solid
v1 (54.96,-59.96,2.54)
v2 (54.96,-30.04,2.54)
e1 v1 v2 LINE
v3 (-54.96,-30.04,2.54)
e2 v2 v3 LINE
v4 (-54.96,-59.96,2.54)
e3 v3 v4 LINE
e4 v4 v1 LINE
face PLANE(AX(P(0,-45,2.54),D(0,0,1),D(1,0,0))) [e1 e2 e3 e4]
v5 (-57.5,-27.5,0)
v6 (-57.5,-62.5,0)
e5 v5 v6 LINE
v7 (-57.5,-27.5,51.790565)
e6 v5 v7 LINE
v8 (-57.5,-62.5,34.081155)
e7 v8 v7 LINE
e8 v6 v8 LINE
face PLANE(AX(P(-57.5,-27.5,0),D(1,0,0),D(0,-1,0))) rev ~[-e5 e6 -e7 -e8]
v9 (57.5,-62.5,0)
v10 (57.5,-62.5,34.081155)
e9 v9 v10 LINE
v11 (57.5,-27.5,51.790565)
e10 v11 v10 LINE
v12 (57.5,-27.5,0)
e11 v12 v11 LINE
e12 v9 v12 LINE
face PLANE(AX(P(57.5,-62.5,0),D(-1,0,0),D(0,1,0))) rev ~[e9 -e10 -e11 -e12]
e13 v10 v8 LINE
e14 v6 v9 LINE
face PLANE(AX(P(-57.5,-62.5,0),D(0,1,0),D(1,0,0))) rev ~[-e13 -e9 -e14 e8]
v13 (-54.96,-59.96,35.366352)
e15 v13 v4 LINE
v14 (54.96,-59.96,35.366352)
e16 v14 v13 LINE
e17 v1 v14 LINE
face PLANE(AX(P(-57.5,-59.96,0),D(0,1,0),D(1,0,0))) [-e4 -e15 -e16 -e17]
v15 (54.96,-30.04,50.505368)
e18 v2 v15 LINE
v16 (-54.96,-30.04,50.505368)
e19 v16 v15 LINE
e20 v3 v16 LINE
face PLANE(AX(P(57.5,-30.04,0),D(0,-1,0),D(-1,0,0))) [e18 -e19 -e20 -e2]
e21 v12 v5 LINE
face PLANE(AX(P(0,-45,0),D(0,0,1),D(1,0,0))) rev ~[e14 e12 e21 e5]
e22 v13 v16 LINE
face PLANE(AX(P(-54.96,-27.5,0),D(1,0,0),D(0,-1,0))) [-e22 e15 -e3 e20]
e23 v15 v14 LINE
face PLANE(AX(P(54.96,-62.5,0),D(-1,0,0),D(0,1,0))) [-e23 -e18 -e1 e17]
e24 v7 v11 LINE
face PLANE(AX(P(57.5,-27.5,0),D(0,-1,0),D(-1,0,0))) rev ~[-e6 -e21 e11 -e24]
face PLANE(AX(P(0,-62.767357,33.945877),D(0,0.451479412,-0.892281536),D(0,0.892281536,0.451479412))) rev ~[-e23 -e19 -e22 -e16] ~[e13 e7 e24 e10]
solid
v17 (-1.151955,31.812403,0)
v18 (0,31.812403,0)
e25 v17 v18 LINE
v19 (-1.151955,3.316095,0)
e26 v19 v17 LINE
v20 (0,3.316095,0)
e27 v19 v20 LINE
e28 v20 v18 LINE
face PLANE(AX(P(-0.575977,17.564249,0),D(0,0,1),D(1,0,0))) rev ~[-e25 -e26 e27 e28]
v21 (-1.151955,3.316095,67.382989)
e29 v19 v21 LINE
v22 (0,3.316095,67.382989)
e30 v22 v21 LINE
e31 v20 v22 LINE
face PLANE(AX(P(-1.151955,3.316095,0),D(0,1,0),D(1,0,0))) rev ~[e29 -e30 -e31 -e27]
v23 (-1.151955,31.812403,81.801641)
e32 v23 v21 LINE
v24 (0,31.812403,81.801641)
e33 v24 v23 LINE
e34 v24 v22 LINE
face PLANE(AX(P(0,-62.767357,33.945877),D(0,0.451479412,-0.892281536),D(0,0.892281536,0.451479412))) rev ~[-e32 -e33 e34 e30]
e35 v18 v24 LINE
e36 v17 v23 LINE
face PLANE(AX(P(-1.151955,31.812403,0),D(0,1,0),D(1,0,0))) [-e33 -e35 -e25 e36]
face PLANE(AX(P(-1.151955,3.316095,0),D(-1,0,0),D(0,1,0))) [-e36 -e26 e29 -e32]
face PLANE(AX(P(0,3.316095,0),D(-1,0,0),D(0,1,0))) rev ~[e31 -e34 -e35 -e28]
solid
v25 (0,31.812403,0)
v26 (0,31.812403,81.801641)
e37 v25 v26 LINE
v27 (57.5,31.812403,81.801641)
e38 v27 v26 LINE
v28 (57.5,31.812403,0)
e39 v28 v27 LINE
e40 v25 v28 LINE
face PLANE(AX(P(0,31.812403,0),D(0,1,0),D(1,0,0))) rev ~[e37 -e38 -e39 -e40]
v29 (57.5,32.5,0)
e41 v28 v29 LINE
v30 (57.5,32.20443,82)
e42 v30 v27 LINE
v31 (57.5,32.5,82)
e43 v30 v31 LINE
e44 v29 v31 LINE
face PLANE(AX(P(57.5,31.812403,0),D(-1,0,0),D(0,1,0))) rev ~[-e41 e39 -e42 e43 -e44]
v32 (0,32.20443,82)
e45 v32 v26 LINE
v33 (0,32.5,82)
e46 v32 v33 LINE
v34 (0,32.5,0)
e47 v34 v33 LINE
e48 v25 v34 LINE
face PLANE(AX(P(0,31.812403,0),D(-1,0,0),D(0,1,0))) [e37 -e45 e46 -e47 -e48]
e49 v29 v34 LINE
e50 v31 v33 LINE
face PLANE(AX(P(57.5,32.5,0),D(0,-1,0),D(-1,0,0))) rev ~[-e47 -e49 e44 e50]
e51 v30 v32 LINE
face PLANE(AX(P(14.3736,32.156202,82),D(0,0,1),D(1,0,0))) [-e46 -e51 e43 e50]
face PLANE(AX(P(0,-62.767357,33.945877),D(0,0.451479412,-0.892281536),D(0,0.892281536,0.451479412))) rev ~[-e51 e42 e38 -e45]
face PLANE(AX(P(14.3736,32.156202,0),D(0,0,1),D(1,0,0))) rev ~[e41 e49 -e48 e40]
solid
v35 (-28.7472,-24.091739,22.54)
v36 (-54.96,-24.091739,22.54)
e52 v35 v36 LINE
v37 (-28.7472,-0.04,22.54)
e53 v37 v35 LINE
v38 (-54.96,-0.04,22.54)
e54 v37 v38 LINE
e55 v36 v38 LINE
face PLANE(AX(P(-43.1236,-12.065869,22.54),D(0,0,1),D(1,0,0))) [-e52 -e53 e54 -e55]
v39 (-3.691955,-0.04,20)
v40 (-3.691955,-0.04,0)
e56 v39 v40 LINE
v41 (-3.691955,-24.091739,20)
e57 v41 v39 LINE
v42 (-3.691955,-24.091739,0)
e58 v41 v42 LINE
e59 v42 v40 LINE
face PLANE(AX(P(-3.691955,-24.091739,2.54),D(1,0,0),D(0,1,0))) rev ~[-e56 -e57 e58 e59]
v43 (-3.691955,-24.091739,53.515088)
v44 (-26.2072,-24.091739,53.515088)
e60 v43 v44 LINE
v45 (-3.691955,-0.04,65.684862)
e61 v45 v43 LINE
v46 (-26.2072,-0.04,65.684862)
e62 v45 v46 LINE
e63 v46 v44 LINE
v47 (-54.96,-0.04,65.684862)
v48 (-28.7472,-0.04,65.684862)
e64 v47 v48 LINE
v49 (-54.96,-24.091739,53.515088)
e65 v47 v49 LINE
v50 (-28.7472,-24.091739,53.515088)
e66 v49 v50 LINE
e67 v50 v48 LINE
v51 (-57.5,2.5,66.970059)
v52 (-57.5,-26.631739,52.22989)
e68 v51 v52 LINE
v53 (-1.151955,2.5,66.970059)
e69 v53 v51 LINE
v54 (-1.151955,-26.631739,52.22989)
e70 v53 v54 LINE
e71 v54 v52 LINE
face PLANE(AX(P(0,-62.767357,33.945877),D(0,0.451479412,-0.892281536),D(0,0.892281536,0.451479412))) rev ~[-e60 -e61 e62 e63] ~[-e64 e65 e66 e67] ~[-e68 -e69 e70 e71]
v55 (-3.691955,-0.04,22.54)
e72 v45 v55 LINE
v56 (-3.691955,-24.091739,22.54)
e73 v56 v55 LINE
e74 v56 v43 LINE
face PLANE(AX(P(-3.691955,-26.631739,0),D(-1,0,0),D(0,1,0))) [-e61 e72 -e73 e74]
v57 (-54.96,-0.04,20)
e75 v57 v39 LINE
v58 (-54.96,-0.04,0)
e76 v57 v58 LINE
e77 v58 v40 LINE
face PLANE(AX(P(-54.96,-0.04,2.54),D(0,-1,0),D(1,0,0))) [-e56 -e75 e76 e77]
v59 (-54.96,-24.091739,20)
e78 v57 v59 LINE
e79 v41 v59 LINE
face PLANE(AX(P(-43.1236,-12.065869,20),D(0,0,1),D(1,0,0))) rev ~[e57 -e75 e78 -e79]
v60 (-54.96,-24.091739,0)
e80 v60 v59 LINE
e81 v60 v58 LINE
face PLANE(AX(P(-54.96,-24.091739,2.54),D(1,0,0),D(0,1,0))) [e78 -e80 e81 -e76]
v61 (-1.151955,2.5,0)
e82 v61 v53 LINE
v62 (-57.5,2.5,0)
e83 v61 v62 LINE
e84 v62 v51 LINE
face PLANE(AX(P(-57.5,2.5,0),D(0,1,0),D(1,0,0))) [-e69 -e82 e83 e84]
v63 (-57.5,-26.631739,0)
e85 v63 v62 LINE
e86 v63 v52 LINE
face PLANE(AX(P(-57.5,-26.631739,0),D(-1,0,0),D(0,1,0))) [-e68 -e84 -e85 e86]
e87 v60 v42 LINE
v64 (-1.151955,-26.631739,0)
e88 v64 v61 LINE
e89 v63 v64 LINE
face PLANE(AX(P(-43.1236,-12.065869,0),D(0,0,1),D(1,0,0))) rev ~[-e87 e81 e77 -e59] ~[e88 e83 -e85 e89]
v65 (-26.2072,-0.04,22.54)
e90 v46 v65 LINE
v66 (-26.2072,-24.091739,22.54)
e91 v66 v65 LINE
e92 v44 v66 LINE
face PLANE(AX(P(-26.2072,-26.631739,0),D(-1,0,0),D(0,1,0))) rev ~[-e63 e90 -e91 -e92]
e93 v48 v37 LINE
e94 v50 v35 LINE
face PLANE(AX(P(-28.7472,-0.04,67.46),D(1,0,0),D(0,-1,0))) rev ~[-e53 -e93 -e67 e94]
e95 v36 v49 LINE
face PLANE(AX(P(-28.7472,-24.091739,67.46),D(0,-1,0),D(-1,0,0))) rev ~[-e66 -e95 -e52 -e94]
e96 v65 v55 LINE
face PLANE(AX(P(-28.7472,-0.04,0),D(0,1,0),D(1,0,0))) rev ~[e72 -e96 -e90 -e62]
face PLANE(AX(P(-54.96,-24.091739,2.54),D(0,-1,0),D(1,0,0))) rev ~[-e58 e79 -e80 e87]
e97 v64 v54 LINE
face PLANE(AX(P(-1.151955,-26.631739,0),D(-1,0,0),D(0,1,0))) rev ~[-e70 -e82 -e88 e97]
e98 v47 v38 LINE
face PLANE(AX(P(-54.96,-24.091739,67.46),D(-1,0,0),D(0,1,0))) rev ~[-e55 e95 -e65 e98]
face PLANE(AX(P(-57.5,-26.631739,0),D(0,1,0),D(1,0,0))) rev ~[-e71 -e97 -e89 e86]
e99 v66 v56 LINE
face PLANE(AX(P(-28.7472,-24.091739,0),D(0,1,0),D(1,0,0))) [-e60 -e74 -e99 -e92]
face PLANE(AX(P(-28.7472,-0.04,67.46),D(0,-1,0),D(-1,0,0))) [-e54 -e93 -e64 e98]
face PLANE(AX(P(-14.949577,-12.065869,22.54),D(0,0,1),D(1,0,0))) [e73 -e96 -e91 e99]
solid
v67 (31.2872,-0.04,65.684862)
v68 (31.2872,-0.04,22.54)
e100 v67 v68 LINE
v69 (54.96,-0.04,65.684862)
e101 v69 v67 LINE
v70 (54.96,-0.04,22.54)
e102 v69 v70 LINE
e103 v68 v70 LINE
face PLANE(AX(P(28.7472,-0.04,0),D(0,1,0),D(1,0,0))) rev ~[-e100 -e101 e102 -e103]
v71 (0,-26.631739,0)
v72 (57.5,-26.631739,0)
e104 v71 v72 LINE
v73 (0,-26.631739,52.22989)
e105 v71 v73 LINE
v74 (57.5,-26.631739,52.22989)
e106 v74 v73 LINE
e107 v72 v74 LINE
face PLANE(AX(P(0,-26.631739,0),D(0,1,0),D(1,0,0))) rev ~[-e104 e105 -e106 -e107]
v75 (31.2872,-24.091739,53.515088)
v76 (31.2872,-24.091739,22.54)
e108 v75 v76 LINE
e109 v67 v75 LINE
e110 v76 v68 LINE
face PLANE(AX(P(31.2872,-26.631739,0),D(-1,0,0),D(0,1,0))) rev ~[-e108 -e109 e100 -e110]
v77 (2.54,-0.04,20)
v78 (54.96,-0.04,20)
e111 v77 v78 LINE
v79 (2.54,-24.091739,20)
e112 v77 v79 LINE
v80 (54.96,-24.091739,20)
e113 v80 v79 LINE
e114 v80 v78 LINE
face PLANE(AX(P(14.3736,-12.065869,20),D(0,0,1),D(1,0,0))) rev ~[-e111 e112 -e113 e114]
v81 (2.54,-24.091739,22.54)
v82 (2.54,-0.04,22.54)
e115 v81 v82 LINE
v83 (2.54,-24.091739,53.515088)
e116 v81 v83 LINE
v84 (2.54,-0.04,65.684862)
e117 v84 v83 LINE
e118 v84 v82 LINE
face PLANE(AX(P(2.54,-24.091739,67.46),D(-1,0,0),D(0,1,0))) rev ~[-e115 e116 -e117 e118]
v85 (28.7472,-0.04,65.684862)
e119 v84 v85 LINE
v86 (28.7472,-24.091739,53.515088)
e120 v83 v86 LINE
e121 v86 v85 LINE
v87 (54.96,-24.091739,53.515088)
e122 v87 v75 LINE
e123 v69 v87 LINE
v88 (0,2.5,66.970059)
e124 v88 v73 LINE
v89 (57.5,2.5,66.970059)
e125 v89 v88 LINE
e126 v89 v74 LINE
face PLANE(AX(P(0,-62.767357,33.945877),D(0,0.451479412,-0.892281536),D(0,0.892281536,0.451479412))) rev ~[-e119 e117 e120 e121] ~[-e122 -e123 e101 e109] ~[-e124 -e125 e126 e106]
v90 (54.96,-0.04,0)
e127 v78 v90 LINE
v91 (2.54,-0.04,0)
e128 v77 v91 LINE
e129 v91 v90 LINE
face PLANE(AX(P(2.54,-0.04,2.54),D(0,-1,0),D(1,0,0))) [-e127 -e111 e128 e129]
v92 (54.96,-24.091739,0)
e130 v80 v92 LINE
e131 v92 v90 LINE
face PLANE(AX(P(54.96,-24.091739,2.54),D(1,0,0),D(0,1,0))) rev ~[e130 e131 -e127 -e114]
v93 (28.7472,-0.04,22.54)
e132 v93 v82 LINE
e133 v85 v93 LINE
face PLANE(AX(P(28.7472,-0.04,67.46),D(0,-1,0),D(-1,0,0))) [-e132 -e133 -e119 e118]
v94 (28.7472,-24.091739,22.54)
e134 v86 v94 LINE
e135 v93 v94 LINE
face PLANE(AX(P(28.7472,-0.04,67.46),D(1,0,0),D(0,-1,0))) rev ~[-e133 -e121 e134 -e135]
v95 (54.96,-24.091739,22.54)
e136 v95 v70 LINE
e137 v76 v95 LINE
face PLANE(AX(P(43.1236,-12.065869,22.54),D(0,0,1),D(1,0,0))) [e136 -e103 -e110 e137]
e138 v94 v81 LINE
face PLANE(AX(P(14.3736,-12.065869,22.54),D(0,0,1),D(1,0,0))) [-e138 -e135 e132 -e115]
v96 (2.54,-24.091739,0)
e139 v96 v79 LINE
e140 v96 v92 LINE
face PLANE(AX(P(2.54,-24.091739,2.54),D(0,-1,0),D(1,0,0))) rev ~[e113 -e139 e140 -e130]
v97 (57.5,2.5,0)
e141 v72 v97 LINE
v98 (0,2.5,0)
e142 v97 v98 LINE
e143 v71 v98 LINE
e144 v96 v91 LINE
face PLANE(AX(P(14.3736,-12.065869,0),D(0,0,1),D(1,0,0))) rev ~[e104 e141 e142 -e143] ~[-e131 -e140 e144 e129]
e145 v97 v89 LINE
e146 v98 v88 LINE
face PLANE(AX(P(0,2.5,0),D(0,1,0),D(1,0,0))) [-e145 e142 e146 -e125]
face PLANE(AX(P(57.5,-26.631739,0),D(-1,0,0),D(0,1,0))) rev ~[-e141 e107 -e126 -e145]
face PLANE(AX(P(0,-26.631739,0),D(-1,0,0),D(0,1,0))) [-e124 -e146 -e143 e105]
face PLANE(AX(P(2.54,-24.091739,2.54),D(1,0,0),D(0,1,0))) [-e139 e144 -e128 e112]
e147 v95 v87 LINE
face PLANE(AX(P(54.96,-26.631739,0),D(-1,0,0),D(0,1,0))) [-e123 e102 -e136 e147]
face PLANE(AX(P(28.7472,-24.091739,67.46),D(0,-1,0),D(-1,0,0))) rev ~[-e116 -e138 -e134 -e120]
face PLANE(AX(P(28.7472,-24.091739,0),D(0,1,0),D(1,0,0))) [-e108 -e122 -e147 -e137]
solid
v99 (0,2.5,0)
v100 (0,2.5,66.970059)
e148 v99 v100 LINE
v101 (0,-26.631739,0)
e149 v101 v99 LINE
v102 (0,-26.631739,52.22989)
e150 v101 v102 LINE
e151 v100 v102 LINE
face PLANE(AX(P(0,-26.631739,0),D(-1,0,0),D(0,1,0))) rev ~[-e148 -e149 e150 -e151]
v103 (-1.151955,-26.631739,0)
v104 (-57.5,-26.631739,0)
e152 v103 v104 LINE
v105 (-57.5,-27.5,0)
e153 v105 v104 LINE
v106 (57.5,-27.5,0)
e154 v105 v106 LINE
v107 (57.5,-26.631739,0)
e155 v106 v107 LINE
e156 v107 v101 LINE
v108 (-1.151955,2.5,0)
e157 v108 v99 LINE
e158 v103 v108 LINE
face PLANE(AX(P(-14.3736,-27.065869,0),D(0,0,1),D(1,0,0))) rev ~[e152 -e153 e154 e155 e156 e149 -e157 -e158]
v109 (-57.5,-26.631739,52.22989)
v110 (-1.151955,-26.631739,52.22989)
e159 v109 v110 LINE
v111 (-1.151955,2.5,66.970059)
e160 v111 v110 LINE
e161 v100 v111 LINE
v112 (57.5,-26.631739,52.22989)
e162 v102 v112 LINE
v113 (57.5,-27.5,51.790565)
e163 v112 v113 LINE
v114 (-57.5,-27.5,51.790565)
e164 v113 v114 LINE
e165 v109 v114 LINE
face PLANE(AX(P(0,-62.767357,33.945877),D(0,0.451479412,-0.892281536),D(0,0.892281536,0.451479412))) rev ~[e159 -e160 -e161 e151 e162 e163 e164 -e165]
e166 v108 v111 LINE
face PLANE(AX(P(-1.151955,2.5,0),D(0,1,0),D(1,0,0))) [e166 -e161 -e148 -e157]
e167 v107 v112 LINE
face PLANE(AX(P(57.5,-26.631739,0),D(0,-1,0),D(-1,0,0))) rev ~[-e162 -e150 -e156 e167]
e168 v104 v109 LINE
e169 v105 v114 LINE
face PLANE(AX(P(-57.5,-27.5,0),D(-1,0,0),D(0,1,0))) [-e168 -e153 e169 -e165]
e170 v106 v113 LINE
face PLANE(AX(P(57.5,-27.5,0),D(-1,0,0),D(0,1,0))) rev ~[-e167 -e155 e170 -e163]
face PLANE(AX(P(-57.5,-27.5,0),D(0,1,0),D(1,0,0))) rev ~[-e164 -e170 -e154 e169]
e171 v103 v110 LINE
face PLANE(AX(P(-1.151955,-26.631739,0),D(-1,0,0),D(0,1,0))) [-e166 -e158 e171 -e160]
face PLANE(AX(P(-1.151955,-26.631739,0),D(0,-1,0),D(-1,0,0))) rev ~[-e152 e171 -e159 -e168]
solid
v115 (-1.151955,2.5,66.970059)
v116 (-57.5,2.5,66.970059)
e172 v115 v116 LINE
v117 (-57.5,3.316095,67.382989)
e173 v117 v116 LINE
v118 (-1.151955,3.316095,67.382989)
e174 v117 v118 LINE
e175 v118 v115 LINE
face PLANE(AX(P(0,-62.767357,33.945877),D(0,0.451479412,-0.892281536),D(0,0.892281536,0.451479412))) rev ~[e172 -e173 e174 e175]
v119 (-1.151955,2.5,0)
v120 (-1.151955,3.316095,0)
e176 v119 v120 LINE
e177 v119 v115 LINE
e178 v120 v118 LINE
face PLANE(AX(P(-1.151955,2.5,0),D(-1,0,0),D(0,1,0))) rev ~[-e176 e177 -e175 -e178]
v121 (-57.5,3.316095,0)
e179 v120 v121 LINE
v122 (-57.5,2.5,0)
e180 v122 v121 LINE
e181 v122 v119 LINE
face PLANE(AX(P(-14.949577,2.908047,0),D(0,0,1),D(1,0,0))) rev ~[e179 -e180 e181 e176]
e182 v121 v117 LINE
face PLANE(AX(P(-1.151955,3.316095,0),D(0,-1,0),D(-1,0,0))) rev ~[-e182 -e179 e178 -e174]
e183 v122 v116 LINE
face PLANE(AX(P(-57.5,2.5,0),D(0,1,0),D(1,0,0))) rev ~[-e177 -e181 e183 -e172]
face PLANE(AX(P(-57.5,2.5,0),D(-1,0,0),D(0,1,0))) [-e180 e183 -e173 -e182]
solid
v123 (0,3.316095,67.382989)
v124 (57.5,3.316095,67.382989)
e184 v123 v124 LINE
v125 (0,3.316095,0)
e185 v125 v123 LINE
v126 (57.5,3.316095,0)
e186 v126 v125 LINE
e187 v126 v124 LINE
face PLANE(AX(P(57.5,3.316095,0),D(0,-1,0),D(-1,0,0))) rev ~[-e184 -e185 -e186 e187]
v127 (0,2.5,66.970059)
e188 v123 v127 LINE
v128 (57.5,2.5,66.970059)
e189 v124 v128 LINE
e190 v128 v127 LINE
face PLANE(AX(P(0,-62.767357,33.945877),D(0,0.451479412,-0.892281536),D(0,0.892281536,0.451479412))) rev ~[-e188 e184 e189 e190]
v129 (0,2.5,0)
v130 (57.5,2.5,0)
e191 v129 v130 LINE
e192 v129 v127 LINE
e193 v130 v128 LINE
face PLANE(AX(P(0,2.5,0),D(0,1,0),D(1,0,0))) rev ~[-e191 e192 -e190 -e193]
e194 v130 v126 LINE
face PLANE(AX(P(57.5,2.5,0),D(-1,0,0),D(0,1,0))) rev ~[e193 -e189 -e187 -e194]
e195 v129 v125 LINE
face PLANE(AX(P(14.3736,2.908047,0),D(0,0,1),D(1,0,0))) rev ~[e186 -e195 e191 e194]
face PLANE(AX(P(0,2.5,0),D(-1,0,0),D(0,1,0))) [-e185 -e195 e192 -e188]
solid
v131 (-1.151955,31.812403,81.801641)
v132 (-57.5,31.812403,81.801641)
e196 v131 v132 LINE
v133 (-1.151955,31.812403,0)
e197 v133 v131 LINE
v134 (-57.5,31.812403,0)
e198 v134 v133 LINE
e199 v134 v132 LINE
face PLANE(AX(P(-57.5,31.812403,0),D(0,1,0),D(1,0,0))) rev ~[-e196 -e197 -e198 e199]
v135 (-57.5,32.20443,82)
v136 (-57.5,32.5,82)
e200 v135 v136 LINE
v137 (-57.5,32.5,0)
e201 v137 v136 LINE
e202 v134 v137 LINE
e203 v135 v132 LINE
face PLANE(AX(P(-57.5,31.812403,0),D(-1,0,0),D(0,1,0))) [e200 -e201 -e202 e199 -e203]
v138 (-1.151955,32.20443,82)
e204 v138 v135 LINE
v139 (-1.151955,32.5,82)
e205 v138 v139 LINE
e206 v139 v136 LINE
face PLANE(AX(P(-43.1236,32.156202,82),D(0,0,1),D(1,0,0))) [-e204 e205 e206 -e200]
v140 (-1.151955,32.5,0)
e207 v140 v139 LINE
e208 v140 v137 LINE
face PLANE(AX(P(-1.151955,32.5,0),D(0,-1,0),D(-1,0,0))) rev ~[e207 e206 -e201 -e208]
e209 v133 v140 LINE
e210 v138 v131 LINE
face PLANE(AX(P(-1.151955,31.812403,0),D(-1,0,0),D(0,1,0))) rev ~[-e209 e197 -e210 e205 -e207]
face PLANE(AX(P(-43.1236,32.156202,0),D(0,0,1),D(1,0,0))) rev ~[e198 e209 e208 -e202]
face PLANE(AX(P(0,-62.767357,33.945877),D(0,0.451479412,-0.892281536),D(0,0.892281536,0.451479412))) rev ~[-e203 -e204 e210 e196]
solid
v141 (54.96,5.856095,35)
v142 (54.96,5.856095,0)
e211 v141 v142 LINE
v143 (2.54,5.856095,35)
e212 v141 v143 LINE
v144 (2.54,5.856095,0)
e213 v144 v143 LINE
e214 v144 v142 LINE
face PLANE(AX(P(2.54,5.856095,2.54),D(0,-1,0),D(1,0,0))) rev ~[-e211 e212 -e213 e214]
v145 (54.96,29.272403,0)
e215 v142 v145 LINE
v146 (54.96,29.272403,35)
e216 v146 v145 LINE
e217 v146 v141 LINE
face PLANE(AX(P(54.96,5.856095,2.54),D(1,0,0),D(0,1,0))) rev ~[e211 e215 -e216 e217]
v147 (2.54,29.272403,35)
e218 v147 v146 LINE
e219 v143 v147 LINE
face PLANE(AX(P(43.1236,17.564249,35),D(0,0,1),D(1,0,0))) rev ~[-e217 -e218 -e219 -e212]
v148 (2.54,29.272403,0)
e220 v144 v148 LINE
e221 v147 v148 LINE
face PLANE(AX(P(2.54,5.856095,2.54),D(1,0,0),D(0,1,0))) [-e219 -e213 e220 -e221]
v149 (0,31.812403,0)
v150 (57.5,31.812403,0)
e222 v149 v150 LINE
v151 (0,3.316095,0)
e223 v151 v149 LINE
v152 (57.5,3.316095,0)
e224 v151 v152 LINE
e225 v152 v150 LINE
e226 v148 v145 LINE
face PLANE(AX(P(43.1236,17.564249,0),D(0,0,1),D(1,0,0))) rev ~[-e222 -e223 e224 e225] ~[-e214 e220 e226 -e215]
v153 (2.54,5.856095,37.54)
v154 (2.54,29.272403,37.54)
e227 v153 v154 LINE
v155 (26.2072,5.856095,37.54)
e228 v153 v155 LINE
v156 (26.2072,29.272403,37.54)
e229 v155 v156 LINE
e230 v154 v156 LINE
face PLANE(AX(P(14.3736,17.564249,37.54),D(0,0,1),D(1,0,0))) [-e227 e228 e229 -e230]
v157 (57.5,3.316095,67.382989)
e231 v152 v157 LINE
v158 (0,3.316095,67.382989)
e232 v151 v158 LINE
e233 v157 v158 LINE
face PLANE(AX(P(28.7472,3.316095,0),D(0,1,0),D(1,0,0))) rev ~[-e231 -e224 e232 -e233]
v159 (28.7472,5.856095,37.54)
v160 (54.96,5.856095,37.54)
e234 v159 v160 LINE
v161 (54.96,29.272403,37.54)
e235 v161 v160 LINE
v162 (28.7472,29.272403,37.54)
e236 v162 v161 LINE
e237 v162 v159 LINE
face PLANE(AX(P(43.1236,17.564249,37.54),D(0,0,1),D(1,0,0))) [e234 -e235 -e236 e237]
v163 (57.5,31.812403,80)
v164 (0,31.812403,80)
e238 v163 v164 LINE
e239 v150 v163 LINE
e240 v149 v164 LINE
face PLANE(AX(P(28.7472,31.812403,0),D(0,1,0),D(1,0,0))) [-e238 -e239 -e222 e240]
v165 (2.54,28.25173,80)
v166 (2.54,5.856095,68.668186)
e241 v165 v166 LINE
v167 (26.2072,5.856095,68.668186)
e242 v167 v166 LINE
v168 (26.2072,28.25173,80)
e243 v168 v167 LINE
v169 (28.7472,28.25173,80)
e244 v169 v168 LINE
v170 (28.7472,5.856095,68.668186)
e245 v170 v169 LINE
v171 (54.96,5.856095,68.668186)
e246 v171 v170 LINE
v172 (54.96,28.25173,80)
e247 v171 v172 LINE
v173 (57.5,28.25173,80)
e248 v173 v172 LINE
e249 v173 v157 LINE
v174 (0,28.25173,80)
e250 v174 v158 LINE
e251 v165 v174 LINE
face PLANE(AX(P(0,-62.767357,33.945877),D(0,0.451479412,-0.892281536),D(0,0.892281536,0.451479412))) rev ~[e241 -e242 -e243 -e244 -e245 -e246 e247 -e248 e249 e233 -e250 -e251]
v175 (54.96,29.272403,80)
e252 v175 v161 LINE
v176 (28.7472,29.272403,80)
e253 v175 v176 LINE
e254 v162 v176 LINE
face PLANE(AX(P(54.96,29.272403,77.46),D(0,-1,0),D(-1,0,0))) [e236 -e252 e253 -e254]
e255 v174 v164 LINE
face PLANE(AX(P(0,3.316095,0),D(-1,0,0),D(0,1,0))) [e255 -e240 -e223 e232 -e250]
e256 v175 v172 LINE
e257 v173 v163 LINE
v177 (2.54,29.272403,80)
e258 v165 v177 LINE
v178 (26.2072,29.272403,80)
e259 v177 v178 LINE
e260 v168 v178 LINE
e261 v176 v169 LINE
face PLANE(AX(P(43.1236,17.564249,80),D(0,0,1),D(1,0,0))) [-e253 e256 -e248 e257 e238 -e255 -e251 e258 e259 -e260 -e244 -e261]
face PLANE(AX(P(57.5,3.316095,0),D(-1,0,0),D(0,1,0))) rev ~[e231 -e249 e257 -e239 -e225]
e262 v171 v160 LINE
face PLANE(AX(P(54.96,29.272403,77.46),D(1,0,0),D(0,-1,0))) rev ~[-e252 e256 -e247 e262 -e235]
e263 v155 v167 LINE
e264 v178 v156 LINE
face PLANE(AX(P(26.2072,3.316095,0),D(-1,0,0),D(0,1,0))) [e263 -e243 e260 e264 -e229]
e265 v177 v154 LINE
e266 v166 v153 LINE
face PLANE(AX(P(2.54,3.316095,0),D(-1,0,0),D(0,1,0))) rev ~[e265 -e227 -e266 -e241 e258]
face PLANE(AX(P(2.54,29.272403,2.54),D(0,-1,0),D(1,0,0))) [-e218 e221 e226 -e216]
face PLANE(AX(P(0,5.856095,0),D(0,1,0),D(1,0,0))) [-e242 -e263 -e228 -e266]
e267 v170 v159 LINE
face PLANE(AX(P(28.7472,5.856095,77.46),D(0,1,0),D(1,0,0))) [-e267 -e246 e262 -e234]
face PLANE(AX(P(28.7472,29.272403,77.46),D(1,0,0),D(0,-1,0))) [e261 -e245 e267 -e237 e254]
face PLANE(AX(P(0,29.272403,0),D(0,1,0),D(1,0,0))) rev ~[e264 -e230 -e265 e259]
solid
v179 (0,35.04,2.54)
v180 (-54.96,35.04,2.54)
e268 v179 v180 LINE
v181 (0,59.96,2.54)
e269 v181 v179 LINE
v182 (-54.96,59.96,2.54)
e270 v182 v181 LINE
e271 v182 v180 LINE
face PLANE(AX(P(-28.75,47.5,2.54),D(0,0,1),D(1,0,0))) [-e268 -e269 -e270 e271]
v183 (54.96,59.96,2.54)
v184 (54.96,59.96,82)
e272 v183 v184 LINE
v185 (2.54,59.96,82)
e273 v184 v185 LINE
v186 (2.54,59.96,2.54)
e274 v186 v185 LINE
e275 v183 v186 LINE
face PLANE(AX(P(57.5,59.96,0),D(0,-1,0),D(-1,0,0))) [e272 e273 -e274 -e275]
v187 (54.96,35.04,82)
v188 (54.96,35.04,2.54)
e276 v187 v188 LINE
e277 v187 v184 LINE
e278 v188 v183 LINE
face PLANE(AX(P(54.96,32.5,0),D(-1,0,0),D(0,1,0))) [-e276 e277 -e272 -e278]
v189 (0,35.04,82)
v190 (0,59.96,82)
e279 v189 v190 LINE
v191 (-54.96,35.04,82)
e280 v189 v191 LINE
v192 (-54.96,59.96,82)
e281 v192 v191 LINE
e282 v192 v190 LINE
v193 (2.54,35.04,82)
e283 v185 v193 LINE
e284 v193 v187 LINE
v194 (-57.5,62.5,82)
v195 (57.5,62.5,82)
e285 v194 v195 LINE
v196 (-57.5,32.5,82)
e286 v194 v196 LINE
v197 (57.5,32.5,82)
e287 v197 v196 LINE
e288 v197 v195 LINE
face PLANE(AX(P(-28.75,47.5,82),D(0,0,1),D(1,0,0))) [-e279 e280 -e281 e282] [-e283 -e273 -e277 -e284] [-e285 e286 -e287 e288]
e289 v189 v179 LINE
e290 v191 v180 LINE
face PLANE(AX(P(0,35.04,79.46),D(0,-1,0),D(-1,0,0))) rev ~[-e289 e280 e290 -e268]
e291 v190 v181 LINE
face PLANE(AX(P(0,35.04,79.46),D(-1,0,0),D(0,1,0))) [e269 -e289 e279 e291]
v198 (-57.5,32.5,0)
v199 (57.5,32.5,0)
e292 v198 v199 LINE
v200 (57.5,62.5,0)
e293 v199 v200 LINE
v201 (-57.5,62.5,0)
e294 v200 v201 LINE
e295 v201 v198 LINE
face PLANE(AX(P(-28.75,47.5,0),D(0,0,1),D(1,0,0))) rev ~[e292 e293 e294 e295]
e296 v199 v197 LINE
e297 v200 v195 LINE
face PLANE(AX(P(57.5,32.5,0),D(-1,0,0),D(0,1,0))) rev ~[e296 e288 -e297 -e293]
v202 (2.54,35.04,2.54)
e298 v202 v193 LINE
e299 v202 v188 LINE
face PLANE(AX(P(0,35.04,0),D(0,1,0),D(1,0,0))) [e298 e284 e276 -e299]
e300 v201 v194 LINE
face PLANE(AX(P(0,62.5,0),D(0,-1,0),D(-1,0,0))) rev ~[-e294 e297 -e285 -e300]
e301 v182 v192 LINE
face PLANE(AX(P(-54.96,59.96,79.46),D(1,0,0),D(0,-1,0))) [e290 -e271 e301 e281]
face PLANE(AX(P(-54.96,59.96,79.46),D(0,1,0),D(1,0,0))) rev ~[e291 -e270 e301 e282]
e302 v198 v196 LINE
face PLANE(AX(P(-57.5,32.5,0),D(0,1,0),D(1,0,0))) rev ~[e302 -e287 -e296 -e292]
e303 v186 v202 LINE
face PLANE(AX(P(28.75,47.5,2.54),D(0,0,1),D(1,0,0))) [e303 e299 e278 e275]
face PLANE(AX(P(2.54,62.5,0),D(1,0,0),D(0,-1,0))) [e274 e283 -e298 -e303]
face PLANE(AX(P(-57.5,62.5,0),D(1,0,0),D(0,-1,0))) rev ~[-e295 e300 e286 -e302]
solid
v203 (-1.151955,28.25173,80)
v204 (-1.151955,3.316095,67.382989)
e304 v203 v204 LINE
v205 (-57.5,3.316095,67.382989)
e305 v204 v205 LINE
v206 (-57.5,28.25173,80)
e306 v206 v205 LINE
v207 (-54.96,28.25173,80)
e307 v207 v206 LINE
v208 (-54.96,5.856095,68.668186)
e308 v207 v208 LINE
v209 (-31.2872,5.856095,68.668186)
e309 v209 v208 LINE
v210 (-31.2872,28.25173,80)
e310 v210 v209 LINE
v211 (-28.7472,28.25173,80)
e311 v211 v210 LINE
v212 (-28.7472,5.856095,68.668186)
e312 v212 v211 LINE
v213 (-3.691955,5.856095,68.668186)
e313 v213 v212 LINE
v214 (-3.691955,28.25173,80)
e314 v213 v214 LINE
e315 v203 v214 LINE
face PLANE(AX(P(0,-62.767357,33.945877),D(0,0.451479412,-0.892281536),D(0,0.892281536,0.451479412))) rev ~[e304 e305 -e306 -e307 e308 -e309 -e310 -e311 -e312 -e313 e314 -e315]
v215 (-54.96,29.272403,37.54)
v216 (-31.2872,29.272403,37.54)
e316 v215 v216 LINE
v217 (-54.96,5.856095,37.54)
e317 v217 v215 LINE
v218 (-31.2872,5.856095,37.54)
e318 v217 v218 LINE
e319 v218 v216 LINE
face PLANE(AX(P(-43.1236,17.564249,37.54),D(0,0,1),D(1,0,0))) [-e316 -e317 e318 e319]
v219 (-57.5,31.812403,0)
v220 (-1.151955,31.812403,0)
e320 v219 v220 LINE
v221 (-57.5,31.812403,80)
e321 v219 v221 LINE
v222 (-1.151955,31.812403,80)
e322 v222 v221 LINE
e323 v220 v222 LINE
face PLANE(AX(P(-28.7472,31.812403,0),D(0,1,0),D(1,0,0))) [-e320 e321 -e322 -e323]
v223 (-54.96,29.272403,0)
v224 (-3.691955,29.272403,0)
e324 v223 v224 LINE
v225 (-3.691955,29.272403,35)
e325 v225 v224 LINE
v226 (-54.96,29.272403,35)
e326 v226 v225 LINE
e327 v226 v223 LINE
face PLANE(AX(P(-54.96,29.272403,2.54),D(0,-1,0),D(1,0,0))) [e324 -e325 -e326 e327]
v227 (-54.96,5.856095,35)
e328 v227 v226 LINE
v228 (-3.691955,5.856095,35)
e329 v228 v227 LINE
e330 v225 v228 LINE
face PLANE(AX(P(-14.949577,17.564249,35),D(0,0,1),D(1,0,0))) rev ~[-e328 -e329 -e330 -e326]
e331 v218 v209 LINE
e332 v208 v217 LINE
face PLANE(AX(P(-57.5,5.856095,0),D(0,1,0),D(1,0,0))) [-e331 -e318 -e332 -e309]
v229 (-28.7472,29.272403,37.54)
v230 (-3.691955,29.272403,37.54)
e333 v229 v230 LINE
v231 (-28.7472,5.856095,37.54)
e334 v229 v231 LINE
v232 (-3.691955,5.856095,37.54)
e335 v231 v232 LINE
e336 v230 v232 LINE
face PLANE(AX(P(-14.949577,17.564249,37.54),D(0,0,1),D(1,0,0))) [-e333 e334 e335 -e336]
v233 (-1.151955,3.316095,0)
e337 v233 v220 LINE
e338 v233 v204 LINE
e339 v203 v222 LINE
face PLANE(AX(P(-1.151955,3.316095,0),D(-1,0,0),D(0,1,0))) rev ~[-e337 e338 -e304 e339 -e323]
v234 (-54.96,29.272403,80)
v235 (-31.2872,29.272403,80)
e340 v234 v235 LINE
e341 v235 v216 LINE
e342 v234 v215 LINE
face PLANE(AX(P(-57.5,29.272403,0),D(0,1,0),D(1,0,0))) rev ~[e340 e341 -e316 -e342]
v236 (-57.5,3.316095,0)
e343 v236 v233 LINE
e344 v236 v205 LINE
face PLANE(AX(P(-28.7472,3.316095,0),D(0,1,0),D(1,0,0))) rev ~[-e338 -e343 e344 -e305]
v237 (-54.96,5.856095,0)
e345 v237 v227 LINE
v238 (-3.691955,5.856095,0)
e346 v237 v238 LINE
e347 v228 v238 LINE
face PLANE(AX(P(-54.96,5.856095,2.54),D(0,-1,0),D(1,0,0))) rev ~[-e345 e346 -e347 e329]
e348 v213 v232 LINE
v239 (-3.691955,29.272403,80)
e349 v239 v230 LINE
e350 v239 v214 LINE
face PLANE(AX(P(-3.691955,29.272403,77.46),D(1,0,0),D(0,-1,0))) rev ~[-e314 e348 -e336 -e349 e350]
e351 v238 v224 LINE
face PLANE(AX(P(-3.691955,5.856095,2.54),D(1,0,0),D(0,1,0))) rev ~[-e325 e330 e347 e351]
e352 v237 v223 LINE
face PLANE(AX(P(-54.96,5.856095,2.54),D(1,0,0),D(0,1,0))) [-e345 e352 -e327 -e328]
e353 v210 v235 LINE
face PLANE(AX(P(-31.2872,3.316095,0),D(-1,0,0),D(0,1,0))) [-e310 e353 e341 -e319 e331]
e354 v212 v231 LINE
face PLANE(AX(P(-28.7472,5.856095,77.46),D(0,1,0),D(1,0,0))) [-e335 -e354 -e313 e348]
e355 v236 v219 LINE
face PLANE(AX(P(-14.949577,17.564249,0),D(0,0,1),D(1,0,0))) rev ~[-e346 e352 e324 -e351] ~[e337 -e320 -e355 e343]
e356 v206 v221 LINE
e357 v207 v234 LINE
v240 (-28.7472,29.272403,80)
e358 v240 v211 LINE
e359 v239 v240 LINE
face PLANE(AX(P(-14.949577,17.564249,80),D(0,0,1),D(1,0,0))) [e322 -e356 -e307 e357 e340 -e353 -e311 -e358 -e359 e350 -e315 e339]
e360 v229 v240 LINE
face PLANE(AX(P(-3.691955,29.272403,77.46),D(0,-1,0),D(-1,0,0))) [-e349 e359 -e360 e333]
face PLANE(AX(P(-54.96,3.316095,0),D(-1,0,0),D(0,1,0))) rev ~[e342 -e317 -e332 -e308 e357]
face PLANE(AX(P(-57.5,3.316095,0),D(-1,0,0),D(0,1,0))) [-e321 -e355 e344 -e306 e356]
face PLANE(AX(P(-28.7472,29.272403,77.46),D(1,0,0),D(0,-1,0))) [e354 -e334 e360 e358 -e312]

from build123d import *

# Parameters (mm, degrees)
F1_DEPTH  = 82
F2_T      = -2.54
F3_DEPTH  = 82
F4_T      = -2.54
F5_DEPTH  = 52
F6_T      = -2.54
F0_W      = 28.7528
F0_H      = 29.1317389905
F7_DEPTH  = 70
F8_T      = -2.54
F9_DEPTH  = 20
F0_W_2    = 28.7472
F10_DEPTH = 70
F11_T     = -2.54
F12_DEPTH = 20
F13_T     = -2.54
F0_W_3    = 27.5952454776
F14_DEPTH = 70
F15_T     = -2.54
F16_DEPTH = 20
F17_DEPTH = 70
F18_T     = -2.54
F19_DEPTH = 20
F20_T     = -2.54
F0_H_2    = 28.496308485
F21_DEPTH = 80
F22_T     = -2.54
F23_DEPTH = 35
F24_DEPTH = 80
F25_T     = -2.54
F26_DEPTH = 35
F27_DEPTH = 80
F28_T     = -2.54
F29_DEPTH = 35
F30_DEPTH = 80
F31_T     = -2.54
F32_DEPTH = 35
F33_T     = -2.54
F33_2_T   = -2.54
F0_H_3    = 0.8682610095
F0_W_4    = 1.1519545224
F34_DEPTH = 82
F0_H_4    = 0.816094866
F0_H_5    = 0.6875966489
F36_DEPTH = 112.776


# Not quite as in the source:
# - a shell that OpenCascade refuses in one call is made with other operations: the cavity is built on its own and cut out


with BuildPart() as f1:
    # F0 (on Top) → F1 (new body)
    with BuildSketch(Plane.XY):
        Polygon((28.7472, 32.5), (57.5, 32.5), (57.5, 62.5), (0, 62.5), (0, 32.5), align=None)
    extrude(amount=F1_DEPTH)

    # F2
    f2_openings = [f1.faces().sort_by_distance(p)[0] for p in [
        (28.75, 47.5, 82),
    ]]
    offset(amount=F2_T, openings=f2_openings)

    # F0 (on Top) → F3 (join)
    with BuildSketch(Plane.XY):
        Polygon((-57.5, 62.5), (-57.5, 32.5), (-28.7472, 32.5), (-1.1519545224, 32.5), (0, 32.5), (0, 62.5), align=None)
    extrude(amount=F3_DEPTH)

    # F4: a shell. OpenCascade refuses it in one call, so the cavity is built on its own and cut out:
    # the body offset inwards by the wall thickness, plus a prism from it out through each open face.
    f4_core = offset(f1.part, amount=F4_T, kind=Kind.INTERSECTION, mode=Mode.PRIVATE)
    f4_exits = [f4_core.faces().sort_by_distance(p)[0] for p in [
        (-27.48, 47.5, 79.46),
    ]]
    add(f4_core, mode=Mode.SUBTRACT)
    extrude(f4_exits, amount=-F4_T, mode=Mode.SUBTRACT)


with BuildPart() as f5:
    # F0 (on Top) → F5 (new body)
    with BuildSketch(Plane.XY):
        Polygon((-57.5, -62.5), (57.5, -62.5), (57.5, -27.5), (28.7472, -27.5), (0, -27.5), (-28.7472, -27.5), (-57.5, -27.5), align=None)
    extrude(amount=F5_DEPTH)

    # F6
    f6_openings = [f5.faces().sort_by_distance(p)[0] for p in [
        (0, -45, 52),
    ]]
    offset(amount=F6_T, openings=f6_openings)


with BuildPart() as f7:
    # F0 (on Top) → F7 (new body)
    with BuildSketch(Plane.XY):
        with Locations((43.1236, -12.0658694953)):
            Rectangle(F0_W, F0_H)
    extrude(amount=F7_DEPTH)

    # F8
    f8_openings = [f7.faces().sort_by_distance(p)[0] for p in [
        (43.1236, -12.065869, 70),
    ]]
    offset(amount=F8_T, openings=f8_openings)

    # F9 (add): a face of the model
    f9_faces = [f7.faces().sort_by_distance(p)[0] for p in [
        (43.1236, -12.0658694953, 2.54),
    ]]
    extrude(f9_faces, amount=F9_DEPTH)

    # F0 (on Top) → F10 (join)
    with BuildSketch(Plane.XY):
        with Locations((14.3736, -12.0658694953)):
            Rectangle(F0_W_2, F0_H)
    extrude(amount=F10_DEPTH)

    # F11: a shell. OpenCascade refuses it in one call, so the cavity is built on its own and cut out:
    # the body offset inwards by the wall thickness, plus a prism from it out through each open face.
    f11_core = offset(f7.part, amount=F11_T, kind=Kind.INTERSECTION, mode=Mode.PRIVATE)
    f11_exits = [f11_core.faces().sort_by_distance(p)[0] for p in [
        (15.6436, -12.065869, 67.46),
    ]]
    add(f11_core, mode=Mode.SUBTRACT)
    extrude(f11_exits, amount=-F11_T, mode=Mode.SUBTRACT)

    # F12 (add): a face of the model
    f12_faces = [f7.faces().sort_by_distance(p)[0] for p in [
        (28.75, -12.0658694953, 2.54),
    ]]
    extrude(f12_faces, amount=F12_DEPTH)

    # F13: a shell. OpenCascade refuses it in one call, so the cavity is built on its own and cut out:
    # the body offset inwards by the wall thickness, plus a prism from it out through each open face.
    f13_core = offset(f7.part, amount=F13_T, kind=Kind.INTERSECTION, mode=Mode.PRIVATE)
    f13_exits = [f13_core.faces().sort_by_distance(p)[0] for p in [
        (28.75, -12.065869, 2.54),
    ]]
    add(f13_core, mode=Mode.SUBTRACT)
    extrude(f13_exits, amount=-F13_T, mode=Mode.SUBTRACT)


with BuildPart() as f14:
    # F0 (on Top) → F14 (new body)
    with BuildSketch(Plane.XY):
        with Locations((-14.9495772612, -12.0658694953)):
            Rectangle(F0_W_3, F0_H)
    extrude(amount=F14_DEPTH)

    # F15
    f15_openings = [f14.faces().sort_by_distance(p)[0] for p in [
        (-14.949577, -12.065869, 70),
    ]]
    offset(amount=F15_T, openings=f15_openings)

    # F16 (add): a face of the model
    f16_faces = [f14.faces().sort_by_distance(p)[0] for p in [
        (-14.9495772612, -12.0658694953, 2.54),
    ]]
    extrude(f16_faces, amount=F16_DEPTH)

    # F0 (on Top) → F17 (join)
    with BuildSketch(Plane.XY):
        with Locations((-43.1236, -12.0658694953)):
            Rectangle(F0_W, F0_H)
    extrude(amount=F17_DEPTH)

    # F18: a shell. OpenCascade refuses it in one call, so the cavity is built on its own and cut out:
    # the body offset inwards by the wall thickness, plus a prism from it out through each open face.
    f18_core = offset(f14.part, amount=F18_T, kind=Kind.INTERSECTION, mode=Mode.PRIVATE)
    f18_exits = [f18_core.faces().sort_by_distance(p)[0] for p in [
        (-41.8536, -12.065869, 67.46),
    ]]
    add(f18_core, mode=Mode.SUBTRACT)
    extrude(f18_exits, amount=-F18_T, mode=Mode.SUBTRACT)

    # F19 (add): a face of the model
    f19_faces = [f14.faces().sort_by_distance(p)[0] for p in [
        (-29.3259772612, -12.0658694953, 2.54),
    ]]
    extrude(f19_faces, amount=F19_DEPTH)

    # F20: a shell. OpenCascade refuses it in one call, so the cavity is built on its own and cut out:
    # the body offset inwards by the wall thickness, plus a prism from it out through each open face.
    f20_core = offset(f14.part, amount=F20_T, kind=Kind.INTERSECTION, mode=Mode.PRIVATE)
    f20_exits = [f20_core.faces().sort_by_distance(p)[0] for p in [
        (-29.325977, -12.065869, 2.54),
    ]]
    add(f20_core, mode=Mode.SUBTRACT)
    extrude(f20_exits, amount=-F20_T, mode=Mode.SUBTRACT)


with BuildPart() as f21:
    # F0 (on Top) → F21 (new body)
    with BuildSketch(Plane.XY):
        with Locations((-43.1236, 17.5642491085)):
            Rectangle(F0_W, F0_H_2)
    extrude(amount=F21_DEPTH)

    # F22
    f22_openings = [f21.faces().sort_by_distance(p)[0] for p in [
        (-43.1236, 17.564249, 80),
    ]]
    offset(amount=F22_T, openings=f22_openings)

    # F23 (add): a face of the model
    f23_faces = [f21.faces().sort_by_distance(p)[0] for p in [
        (-43.1236, 17.5642491085, 2.54),
    ]]
    extrude(f23_faces, amount=F23_DEPTH)

    # F0 (on Top) → F24 (join)
    with BuildSketch(Plane.XY):
        with Locations((-14.9495772612, 17.5642491085)):
            Rectangle(F0_W_3, F0_H_2)
    extrude(amount=F24_DEPTH)

    # F25: a shell. OpenCascade refuses it in one call, so the cavity is built on its own and cut out:
    # the body offset inwards by the wall thickness, plus a prism from it out through each open face.
    f25_core = offset(f21.part, amount=F25_T, kind=Kind.INTERSECTION, mode=Mode.PRIVATE)
    f25_exits = [f25_core.faces().sort_by_distance(p)[0] for p in [
        (-16.219577, 17.564249, 77.46),
    ]]
    add(f25_core, mode=Mode.SUBTRACT)
    extrude(f25_exits, amount=-F25_T, mode=Mode.SUBTRACT)

    # F26 (add): a face of the model
    f26_faces = [f21.faces().sort_by_distance(p)[0] for p in [
        (-29.3259772612, 17.5642491085, 2.54),
    ]]
    extrude(f26_faces, amount=F26_DEPTH)

    # F33#2: a shell. OpenCascade refuses it in one call, so the cavity is built on its own and cut out:
    # the body offset inwards by the wall thickness, plus a prism from it out through each open face.
    f33_2_core = offset(f21.part, amount=F33_2_T, kind=Kind.INTERSECTION, mode=Mode.PRIVATE)
    f33_2_exits = [f33_2_core.faces().sort_by_distance(p)[0] for p in [
        (-29.325977, 17.564249, 2.54),
    ]]
    add(f33_2_core, mode=Mode.SUBTRACT)
    extrude(f33_2_exits, amount=-F33_2_T, mode=Mode.SUBTRACT)


with BuildPart() as f27:
    # F0 (on Top) → F27 (new body)
    with BuildSketch(Plane.XY):
        with Locations((14.3736, 17.5642491085)):
            Rectangle(F0_W_2, F0_H_2)
    extrude(amount=F27_DEPTH)

    # F28
    f28_openings = [f27.faces().sort_by_distance(p)[0] for p in [
        (14.3736, 17.564249, 80),
    ]]
    offset(amount=F28_T, openings=f28_openings)

    # F29 (add): a face of the model
    f29_faces = [f27.faces().sort_by_distance(p)[0] for p in [
        (14.3736, 17.5642491085, 2.54),
    ]]
    extrude(f29_faces, amount=F29_DEPTH)

    # F0 (on Top) → F30 (join)
    with BuildSketch(Plane.XY):
        with Locations((43.1236, 17.5642491085)):
            Rectangle(F0_W, F0_H_2)
    extrude(amount=F30_DEPTH)

    # F31: a shell. OpenCascade refuses it in one call, so the cavity is built on its own and cut out:
    # the body offset inwards by the wall thickness, plus a prism from it out through each open face.
    f31_core = offset(f27.part, amount=F31_T, kind=Kind.INTERSECTION, mode=Mode.PRIVATE)
    f31_exits = [f31_core.faces().sort_by_distance(p)[0] for p in [
        (41.8536, 17.564249, 77.46),
    ]]
    add(f31_core, mode=Mode.SUBTRACT)
    extrude(f31_exits, amount=-F31_T, mode=Mode.SUBTRACT)

    # F32 (add): a face of the model
    f32_faces = [f27.faces().sort_by_distance(p)[0] for p in [
        (28.75, 17.5642491085, 2.54),
    ]]
    extrude(f32_faces, amount=F32_DEPTH)

    # F33: a shell. OpenCascade refuses it in one call, so the cavity is built on its own and cut out:
    # the body offset inwards by the wall thickness, plus a prism from it out through each open face.
    f33_core = offset(f27.part, amount=F33_T, kind=Kind.INTERSECTION, mode=Mode.PRIVATE)
    f33_exits = [f33_core.faces().sort_by_distance(p)[0] for p in [
        (28.75, 17.564249, 2.54),
    ]]
    add(f33_core, mode=Mode.SUBTRACT)
    extrude(f33_exits, amount=-F33_T, mode=Mode.SUBTRACT)


with BuildPart() as f34:
    # F0 (on Top) → F34 (new body)
    with BuildSketch(Plane.XY):
        Polygon((-28.7472, -26.6317389905), (-28.7472, -27.5), (0, -27.5), (0, -26.6317389905), (-1.1519545224, -26.6317389905), align=None)
        with Locations((-43.1236, -27.0658694953)):
            Rectangle(F0_W, F0_H_3)
        with Locations((43.1236, -27.0658694953)):
            Rectangle(F0_W, F0_H_3)
        with Locations((14.3736, -27.0658694953)):
            Rectangle(F0_W_2, F0_H_3)
        with Locations((-0.5759772612, -12.0658694953)):
            Rectangle(F0_W_4, F0_H)
    extrude(amount=F34_DEPTH)


with BuildPart() as f34b:
    # F0 (on Top) → F34, piece 2 (new body)
    with BuildSketch(Plane.XY):
        with Locations((14.3736, 2.908047433)):
            Rectangle(F0_W_2, F0_H_4)
        with Locations((43.1236, 2.908047433)):
            Rectangle(F0_W, F0_H_4)
    extrude(amount=F34_DEPTH)


with BuildPart() as f34c:
    # F0 (on Top) → F34, piece 3 (new body)
    with BuildSketch(Plane.XY):
        with Locations((-14.9495772612, 2.908047433)):
            Rectangle(F0_W_3, F0_H_4)
        with Locations((-43.1236, 2.908047433)):
            Rectangle(F0_W, F0_H_4)
    extrude(amount=F34_DEPTH)


with BuildPart() as f34d:
    # F0 (on Top) → F34, piece 4 (new body)
    with BuildSketch(Plane.XY):
        with Locations((-43.1236, 32.1562016755)):
            Rectangle(F0_W, F0_H_5)
        with Locations((-14.9495772612, 32.1562016755)):
            Rectangle(F0_W_3, F0_H_5)
    extrude(amount=F34_DEPTH)


with BuildPart() as f34e:
    # F0 (on Top) → F34, piece 5 (new body)
    with BuildSketch(Plane.XY):
        with Locations((-0.5759772612, 17.5642491085)):
            Rectangle(F0_W_4, F0_H_2)
    extrude(amount=F34_DEPTH)


with BuildPart() as f34f:
    # F0 (on Top) → F34, piece 6 (new body)
    with BuildSketch(Plane.XY):
        with Locations((14.3736, 32.1562016755)):
            Rectangle(F0_W_2, F0_H_5)
        with Locations((43.1236, 32.1562016755)):
            Rectangle(F0_W, F0_H_5)
    extrude(amount=F34_DEPTH)


with BuildPart() as f36_tool:
    # F35 (on Right) → F36 (new body, symmetric)
    with BuildSketch(Plane.YZ):
        Polygon((-62.7673566341, 33.945877105), (32.7664129436, 82.2843536735), (33.6038582027, 108.728043735), (-62.7673566341, 108.728043735), align=None)
    extrude(amount=F36_DEPTH, both=True)


with BuildPart() as f5_1:
    add(f5.part)

    # F36: cut by f36_tool
    add(f36_tool.part, mode=Mode.SUBTRACT)


with BuildPart() as f7_1:
    add(f7.part)

    # F36: cut by f36_tool
    add(f36_tool.part, mode=Mode.SUBTRACT)


with BuildPart() as f14_1:
    add(f14.part)

    # F36: cut by f36_tool
    add(f36_tool.part, mode=Mode.SUBTRACT)


with BuildPart() as f21_1:
    add(f21.part)

    # F36: cut by f36_tool
    add(f36_tool.part, mode=Mode.SUBTRACT)


with BuildPart() as f27_1:
    add(f27.part)

    # F36: cut by f36_tool
    add(f36_tool.part, mode=Mode.SUBTRACT)


with BuildPart() as f34_1:
    add(f34.part)

    # F36: cut by f36_tool
    add(f36_tool.part, mode=Mode.SUBTRACT)


with BuildPart() as f34b_1:
    add(f34b.part)

    # F36: cut by f36_tool
    add(f36_tool.part, mode=Mode.SUBTRACT)


with BuildPart() as f34c_1:
    add(f34c.part)

    # F36: cut by f36_tool
    add(f36_tool.part, mode=Mode.SUBTRACT)


with BuildPart() as f34d_1:
    add(f34d.part)

    # F36: cut by f36_tool
    add(f36_tool.part, mode=Mode.SUBTRACT)


with BuildPart() as f34e_1:
    add(f34e.part)

    # F36: cut by f36_tool
    add(f36_tool.part, mode=Mode.SUBTRACT)


with BuildPart() as f34f_1:
    add(f34f.part)

    # F36: cut by f36_tool
    add(f36_tool.part, mode=Mode.SUBTRACT)


solid = Compound([f1.part, f5_1.part, f7_1.part, f14_1.part, f21_1.part, f27_1.part, f34_1.part, f34b_1.part, f34c_1.part, f34d_1.part, f34e_1.part, f34f_1.part])
